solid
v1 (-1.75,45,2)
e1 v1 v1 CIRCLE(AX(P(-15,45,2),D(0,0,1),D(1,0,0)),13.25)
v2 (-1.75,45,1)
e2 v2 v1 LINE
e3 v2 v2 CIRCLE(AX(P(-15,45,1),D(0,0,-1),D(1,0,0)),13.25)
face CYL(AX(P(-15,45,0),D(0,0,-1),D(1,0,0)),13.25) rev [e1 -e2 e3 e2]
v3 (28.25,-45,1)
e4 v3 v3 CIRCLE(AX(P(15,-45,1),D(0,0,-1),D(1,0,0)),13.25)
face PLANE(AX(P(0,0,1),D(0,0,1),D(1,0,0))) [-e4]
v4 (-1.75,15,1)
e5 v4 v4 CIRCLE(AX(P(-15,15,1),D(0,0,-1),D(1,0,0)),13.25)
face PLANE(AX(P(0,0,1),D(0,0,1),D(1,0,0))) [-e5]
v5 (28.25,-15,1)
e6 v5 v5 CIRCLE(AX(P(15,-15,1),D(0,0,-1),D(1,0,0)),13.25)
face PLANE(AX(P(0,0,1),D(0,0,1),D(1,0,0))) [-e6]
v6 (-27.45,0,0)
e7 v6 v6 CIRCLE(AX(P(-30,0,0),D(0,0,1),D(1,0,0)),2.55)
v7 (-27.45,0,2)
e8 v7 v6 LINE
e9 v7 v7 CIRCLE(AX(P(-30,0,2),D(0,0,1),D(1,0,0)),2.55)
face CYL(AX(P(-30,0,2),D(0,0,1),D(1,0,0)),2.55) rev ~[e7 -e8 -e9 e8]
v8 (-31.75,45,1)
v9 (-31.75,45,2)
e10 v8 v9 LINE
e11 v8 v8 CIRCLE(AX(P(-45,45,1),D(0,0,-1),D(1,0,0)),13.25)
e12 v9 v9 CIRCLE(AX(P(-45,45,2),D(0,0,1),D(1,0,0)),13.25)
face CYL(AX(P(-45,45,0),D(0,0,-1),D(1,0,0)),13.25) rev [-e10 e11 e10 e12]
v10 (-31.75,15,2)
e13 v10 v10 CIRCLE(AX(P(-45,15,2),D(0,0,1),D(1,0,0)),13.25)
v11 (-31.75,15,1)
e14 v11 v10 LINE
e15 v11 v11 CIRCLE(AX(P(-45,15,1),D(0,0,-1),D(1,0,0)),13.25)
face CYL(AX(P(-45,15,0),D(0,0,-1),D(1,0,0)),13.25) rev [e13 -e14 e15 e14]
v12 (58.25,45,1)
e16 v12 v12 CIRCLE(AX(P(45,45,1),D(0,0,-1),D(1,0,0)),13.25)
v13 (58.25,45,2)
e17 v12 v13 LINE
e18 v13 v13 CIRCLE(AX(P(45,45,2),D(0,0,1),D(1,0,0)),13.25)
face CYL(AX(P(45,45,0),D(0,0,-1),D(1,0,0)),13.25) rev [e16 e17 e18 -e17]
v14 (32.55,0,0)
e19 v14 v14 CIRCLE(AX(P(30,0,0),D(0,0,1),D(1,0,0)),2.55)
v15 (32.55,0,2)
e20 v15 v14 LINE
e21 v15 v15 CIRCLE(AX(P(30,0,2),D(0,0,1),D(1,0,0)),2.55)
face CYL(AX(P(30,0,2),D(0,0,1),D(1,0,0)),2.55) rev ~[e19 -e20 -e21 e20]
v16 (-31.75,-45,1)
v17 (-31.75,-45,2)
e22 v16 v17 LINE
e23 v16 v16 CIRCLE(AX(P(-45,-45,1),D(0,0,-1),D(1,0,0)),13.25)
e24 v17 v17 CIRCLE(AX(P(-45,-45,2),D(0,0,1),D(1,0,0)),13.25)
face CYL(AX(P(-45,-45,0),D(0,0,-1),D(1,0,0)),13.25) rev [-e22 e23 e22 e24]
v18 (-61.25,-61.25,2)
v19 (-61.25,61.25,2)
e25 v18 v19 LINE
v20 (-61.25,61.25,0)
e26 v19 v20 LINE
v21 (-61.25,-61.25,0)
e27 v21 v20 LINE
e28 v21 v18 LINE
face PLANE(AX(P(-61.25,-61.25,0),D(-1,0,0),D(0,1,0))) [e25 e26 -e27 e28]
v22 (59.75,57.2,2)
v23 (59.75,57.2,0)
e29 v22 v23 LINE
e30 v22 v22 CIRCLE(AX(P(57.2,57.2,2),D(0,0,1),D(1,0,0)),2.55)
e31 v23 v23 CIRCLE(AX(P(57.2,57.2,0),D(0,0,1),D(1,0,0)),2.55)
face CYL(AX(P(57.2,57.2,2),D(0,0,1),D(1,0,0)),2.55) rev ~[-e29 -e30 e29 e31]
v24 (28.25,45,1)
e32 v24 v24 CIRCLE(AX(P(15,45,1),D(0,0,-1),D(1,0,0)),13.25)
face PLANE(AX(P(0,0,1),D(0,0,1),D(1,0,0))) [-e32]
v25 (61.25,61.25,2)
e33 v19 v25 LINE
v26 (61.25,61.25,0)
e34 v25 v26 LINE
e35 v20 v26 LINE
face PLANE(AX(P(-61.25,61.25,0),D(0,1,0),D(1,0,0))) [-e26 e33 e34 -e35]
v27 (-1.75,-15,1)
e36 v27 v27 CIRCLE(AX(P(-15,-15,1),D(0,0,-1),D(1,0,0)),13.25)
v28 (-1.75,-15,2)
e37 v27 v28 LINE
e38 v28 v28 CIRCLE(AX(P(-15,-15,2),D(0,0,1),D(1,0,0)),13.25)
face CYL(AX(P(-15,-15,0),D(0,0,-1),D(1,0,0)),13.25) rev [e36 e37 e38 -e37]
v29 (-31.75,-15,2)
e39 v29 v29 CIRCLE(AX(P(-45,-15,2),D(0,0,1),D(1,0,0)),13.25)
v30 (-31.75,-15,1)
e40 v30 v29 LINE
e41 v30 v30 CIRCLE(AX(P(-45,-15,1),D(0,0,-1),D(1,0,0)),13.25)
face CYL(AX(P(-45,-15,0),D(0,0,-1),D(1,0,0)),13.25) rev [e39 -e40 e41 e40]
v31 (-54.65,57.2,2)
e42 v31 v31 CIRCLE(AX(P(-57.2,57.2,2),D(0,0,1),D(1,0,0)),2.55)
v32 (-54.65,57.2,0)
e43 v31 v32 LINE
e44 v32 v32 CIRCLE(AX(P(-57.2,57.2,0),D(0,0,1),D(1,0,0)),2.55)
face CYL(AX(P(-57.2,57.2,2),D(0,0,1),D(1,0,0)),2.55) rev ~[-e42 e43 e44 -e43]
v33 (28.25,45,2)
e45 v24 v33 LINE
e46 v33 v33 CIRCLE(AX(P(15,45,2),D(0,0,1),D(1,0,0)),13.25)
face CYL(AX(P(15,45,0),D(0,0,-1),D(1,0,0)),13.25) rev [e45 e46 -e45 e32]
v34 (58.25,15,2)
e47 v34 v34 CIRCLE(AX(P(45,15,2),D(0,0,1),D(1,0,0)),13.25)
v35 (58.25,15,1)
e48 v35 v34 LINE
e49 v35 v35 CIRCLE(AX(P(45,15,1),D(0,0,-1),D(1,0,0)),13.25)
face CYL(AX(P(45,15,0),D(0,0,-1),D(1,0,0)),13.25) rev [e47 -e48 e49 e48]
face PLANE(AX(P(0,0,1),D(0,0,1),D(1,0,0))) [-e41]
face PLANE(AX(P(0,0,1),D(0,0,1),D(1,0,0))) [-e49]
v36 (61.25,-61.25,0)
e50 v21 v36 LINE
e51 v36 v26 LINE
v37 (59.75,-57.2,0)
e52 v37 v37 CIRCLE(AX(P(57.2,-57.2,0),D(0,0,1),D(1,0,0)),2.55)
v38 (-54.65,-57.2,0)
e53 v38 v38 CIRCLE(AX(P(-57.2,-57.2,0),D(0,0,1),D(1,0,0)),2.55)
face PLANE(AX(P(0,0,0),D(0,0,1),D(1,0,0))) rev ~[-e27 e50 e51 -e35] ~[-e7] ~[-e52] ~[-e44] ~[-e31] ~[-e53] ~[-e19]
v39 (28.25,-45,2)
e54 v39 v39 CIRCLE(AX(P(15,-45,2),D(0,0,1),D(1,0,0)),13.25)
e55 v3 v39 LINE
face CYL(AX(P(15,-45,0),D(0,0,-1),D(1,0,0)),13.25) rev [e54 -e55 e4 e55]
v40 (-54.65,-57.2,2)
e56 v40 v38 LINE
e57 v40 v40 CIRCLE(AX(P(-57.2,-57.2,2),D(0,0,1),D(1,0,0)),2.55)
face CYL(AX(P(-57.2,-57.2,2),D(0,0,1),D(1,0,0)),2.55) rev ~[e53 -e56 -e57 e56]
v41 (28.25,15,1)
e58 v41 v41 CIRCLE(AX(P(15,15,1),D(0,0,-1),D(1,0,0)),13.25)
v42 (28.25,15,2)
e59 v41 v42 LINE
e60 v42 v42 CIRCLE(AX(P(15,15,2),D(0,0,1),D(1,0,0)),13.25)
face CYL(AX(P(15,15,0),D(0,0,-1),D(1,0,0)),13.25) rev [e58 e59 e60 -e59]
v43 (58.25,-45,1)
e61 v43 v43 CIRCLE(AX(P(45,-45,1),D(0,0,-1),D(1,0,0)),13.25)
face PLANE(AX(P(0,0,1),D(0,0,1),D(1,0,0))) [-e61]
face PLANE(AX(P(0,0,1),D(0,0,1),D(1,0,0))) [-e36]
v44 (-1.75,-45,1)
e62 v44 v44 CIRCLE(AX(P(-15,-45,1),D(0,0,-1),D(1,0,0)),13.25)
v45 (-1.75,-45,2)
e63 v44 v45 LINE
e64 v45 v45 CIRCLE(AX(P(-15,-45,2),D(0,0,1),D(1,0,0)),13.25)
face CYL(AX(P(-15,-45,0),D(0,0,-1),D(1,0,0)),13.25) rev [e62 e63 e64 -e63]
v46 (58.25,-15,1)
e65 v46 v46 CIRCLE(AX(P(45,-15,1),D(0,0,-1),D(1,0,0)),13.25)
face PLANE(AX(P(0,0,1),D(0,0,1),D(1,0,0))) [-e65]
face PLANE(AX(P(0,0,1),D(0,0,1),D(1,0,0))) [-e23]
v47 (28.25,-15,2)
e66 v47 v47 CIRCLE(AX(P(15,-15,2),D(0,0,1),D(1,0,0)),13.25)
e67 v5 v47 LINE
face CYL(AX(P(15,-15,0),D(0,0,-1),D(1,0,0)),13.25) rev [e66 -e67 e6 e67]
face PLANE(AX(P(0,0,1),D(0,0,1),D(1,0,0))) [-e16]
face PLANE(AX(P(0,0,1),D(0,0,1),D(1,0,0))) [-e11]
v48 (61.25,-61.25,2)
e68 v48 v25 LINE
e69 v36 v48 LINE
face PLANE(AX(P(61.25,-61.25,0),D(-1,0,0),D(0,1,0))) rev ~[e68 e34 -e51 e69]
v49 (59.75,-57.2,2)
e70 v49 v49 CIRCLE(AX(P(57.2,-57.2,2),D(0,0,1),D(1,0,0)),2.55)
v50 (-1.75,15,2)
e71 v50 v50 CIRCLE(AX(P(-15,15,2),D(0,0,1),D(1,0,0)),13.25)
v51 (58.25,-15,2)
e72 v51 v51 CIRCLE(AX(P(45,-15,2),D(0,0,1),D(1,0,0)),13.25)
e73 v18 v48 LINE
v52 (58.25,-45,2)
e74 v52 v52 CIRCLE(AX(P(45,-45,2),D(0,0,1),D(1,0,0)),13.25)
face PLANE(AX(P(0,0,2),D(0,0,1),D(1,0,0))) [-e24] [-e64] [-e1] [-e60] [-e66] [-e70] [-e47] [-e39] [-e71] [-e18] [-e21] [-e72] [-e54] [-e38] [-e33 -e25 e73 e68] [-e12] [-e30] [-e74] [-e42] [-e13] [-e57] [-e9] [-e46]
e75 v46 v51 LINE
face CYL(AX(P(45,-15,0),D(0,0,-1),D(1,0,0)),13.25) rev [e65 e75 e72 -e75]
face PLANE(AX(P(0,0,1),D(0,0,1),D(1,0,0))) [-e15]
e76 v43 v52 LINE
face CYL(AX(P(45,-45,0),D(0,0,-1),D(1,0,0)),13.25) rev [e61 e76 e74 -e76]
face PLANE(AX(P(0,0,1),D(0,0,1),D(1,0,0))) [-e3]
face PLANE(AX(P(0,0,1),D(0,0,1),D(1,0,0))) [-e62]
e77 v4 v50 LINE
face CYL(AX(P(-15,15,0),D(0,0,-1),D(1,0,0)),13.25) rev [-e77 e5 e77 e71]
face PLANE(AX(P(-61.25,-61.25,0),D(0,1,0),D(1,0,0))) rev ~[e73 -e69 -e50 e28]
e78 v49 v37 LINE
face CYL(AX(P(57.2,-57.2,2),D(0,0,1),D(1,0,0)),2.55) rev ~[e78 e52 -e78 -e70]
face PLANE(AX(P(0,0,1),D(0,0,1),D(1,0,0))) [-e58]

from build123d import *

# Parameters (mm, degrees)
F0_W     = 122.5
F0_H     = 122.5
F0_R     = 13.25
F1_DEPTH = 1
F2_DEPTH = 2
F3_R     = 2.55
F4_DEPTH = 2.001


# Not quite as in the source:
# - a feature names something its author has since deleted; it is built from what else it names


with BuildPart() as f1:
    # F0 (on Top) → F1 (new body)
    with BuildSketch(Plane.XY):
        Rectangle(F0_W, F0_H)
        with Locations((-45, -45)):
            Circle(F0_R, mode=Mode.SUBTRACT)
        with Locations((-15, -45)):
            Circle(F0_R, mode=Mode.SUBTRACT)
        with Locations((-45, -15)):
            Circle(F0_R, mode=Mode.SUBTRACT)
        with Locations((-15, -15)):
            Circle(F0_R, mode=Mode.SUBTRACT)
        with Locations((15, -45)):
            Circle(F0_R, mode=Mode.SUBTRACT)
        with Locations((45, -45)):
            Circle(F0_R, mode=Mode.SUBTRACT)
        with Locations((15, -15)):
            Circle(F0_R, mode=Mode.SUBTRACT)
        with Locations((45, -15)):
            Circle(F0_R, mode=Mode.SUBTRACT)
        with Locations((-45, 15)):
            Circle(F0_R, mode=Mode.SUBTRACT)
        with Locations((-15, 15)):
            Circle(F0_R, mode=Mode.SUBTRACT)
        with Locations((-45, 45)):
            Circle(F0_R, mode=Mode.SUBTRACT)
        with Locations((-15, 45)):
            Circle(F0_R, mode=Mode.SUBTRACT)
        with Locations((15, 15)):
            Circle(F0_R, mode=Mode.SUBTRACT)
        with Locations((45, 15)):
            Circle(F0_R, mode=Mode.SUBTRACT)
        with Locations((15, 45)):
            Circle(F0_R, mode=Mode.SUBTRACT)
        with Locations((45, 45)):
            Circle(F0_R, mode=Mode.SUBTRACT)
        with Locations((-45, 45)):
            Circle(F0_R)
        with Locations((-15, 45)):
            Circle(F0_R)
        with Locations((15, 45)):
            Circle(F0_R)
        with Locations((45, 45)):
            Circle(F0_R)
        with Locations((45, 15)):
            Circle(F0_R)
        with Locations((-15, 15)):
            Circle(F0_R)
        with Locations((-45, 15)):
            Circle(F0_R)
        with Locations((15, 15)):
            Circle(F0_R)
        with Locations((15, -15)):
            Circle(F0_R)
        with Locations((-15, -15)):
            Circle(F0_R)
        with Locations((-45, -15)):
            Circle(F0_R)
        with Locations((45, -15)):
            Circle(F0_R)
        with Locations((45, -45)):
            Circle(F0_R)
        with Locations((15, -45)):
            Circle(F0_R)
        with Locations((-15, -45)):
            Circle(F0_R)
        with Locations((-45, -45)):
            Circle(F0_R)
    extrude(amount=F1_DEPTH)

    # F0 (on Top) → F2 (join)
    with BuildSketch(Plane.XY):
        Rectangle(F0_W, F0_H)
        with Locations((-45, -45)):
            Circle(F0_R, mode=Mode.SUBTRACT)
        with Locations((-15, -45)):
            Circle(F0_R, mode=Mode.SUBTRACT)
        with Locations((-45, -15)):
            Circle(F0_R, mode=Mode.SUBTRACT)
        with Locations((-15, -15)):
            Circle(F0_R, mode=Mode.SUBTRACT)
        with Locations((15, -45)):
            Circle(F0_R, mode=Mode.SUBTRACT)
        with Locations((45, -45)):
            Circle(F0_R, mode=Mode.SUBTRACT)
        with Locations((15, -15)):
            Circle(F0_R, mode=Mode.SUBTRACT)
        with Locations((45, -15)):
            Circle(F0_R, mode=Mode.SUBTRACT)
        with Locations((-45, 15)):
            Circle(F0_R, mode=Mode.SUBTRACT)
        with Locations((-15, 15)):
            Circle(F0_R, mode=Mode.SUBTRACT)
        with Locations((-45, 45)):
            Circle(F0_R, mode=Mode.SUBTRACT)
        with Locations((-15, 45)):
            Circle(F0_R, mode=Mode.SUBTRACT)
        with Locations((15, 15)):
            Circle(F0_R, mode=Mode.SUBTRACT)
        with Locations((45, 15)):
            Circle(F0_R, mode=Mode.SUBTRACT)
        with Locations((15, 45)):
            Circle(F0_R, mode=Mode.SUBTRACT)
        with Locations((45, 45)):
            Circle(F0_R, mode=Mode.SUBTRACT)
    extrude(amount=F2_DEPTH)

    # F3 (on face) → F4 (cut, through all)
    with BuildSketch(Plane.XY.offset(2)):
        with Locations((-57.2, 57.2)):
            Circle(F3_R)
        with Locations((-30, 0)):
            Circle(F3_R)
        with Locations((57.2, 57.2)):
            Circle(F3_R)
        with Locations((30, 0)):
            Circle(F3_R)
        with Locations((57.2, -57.2)):
            Circle(F3_R)
        with Locations((-57.2, -57.2)):
            Circle(F3_R)
    extrude(amount=-F4_DEPTH, mode=Mode.SUBTRACT)


solid = f1.part
